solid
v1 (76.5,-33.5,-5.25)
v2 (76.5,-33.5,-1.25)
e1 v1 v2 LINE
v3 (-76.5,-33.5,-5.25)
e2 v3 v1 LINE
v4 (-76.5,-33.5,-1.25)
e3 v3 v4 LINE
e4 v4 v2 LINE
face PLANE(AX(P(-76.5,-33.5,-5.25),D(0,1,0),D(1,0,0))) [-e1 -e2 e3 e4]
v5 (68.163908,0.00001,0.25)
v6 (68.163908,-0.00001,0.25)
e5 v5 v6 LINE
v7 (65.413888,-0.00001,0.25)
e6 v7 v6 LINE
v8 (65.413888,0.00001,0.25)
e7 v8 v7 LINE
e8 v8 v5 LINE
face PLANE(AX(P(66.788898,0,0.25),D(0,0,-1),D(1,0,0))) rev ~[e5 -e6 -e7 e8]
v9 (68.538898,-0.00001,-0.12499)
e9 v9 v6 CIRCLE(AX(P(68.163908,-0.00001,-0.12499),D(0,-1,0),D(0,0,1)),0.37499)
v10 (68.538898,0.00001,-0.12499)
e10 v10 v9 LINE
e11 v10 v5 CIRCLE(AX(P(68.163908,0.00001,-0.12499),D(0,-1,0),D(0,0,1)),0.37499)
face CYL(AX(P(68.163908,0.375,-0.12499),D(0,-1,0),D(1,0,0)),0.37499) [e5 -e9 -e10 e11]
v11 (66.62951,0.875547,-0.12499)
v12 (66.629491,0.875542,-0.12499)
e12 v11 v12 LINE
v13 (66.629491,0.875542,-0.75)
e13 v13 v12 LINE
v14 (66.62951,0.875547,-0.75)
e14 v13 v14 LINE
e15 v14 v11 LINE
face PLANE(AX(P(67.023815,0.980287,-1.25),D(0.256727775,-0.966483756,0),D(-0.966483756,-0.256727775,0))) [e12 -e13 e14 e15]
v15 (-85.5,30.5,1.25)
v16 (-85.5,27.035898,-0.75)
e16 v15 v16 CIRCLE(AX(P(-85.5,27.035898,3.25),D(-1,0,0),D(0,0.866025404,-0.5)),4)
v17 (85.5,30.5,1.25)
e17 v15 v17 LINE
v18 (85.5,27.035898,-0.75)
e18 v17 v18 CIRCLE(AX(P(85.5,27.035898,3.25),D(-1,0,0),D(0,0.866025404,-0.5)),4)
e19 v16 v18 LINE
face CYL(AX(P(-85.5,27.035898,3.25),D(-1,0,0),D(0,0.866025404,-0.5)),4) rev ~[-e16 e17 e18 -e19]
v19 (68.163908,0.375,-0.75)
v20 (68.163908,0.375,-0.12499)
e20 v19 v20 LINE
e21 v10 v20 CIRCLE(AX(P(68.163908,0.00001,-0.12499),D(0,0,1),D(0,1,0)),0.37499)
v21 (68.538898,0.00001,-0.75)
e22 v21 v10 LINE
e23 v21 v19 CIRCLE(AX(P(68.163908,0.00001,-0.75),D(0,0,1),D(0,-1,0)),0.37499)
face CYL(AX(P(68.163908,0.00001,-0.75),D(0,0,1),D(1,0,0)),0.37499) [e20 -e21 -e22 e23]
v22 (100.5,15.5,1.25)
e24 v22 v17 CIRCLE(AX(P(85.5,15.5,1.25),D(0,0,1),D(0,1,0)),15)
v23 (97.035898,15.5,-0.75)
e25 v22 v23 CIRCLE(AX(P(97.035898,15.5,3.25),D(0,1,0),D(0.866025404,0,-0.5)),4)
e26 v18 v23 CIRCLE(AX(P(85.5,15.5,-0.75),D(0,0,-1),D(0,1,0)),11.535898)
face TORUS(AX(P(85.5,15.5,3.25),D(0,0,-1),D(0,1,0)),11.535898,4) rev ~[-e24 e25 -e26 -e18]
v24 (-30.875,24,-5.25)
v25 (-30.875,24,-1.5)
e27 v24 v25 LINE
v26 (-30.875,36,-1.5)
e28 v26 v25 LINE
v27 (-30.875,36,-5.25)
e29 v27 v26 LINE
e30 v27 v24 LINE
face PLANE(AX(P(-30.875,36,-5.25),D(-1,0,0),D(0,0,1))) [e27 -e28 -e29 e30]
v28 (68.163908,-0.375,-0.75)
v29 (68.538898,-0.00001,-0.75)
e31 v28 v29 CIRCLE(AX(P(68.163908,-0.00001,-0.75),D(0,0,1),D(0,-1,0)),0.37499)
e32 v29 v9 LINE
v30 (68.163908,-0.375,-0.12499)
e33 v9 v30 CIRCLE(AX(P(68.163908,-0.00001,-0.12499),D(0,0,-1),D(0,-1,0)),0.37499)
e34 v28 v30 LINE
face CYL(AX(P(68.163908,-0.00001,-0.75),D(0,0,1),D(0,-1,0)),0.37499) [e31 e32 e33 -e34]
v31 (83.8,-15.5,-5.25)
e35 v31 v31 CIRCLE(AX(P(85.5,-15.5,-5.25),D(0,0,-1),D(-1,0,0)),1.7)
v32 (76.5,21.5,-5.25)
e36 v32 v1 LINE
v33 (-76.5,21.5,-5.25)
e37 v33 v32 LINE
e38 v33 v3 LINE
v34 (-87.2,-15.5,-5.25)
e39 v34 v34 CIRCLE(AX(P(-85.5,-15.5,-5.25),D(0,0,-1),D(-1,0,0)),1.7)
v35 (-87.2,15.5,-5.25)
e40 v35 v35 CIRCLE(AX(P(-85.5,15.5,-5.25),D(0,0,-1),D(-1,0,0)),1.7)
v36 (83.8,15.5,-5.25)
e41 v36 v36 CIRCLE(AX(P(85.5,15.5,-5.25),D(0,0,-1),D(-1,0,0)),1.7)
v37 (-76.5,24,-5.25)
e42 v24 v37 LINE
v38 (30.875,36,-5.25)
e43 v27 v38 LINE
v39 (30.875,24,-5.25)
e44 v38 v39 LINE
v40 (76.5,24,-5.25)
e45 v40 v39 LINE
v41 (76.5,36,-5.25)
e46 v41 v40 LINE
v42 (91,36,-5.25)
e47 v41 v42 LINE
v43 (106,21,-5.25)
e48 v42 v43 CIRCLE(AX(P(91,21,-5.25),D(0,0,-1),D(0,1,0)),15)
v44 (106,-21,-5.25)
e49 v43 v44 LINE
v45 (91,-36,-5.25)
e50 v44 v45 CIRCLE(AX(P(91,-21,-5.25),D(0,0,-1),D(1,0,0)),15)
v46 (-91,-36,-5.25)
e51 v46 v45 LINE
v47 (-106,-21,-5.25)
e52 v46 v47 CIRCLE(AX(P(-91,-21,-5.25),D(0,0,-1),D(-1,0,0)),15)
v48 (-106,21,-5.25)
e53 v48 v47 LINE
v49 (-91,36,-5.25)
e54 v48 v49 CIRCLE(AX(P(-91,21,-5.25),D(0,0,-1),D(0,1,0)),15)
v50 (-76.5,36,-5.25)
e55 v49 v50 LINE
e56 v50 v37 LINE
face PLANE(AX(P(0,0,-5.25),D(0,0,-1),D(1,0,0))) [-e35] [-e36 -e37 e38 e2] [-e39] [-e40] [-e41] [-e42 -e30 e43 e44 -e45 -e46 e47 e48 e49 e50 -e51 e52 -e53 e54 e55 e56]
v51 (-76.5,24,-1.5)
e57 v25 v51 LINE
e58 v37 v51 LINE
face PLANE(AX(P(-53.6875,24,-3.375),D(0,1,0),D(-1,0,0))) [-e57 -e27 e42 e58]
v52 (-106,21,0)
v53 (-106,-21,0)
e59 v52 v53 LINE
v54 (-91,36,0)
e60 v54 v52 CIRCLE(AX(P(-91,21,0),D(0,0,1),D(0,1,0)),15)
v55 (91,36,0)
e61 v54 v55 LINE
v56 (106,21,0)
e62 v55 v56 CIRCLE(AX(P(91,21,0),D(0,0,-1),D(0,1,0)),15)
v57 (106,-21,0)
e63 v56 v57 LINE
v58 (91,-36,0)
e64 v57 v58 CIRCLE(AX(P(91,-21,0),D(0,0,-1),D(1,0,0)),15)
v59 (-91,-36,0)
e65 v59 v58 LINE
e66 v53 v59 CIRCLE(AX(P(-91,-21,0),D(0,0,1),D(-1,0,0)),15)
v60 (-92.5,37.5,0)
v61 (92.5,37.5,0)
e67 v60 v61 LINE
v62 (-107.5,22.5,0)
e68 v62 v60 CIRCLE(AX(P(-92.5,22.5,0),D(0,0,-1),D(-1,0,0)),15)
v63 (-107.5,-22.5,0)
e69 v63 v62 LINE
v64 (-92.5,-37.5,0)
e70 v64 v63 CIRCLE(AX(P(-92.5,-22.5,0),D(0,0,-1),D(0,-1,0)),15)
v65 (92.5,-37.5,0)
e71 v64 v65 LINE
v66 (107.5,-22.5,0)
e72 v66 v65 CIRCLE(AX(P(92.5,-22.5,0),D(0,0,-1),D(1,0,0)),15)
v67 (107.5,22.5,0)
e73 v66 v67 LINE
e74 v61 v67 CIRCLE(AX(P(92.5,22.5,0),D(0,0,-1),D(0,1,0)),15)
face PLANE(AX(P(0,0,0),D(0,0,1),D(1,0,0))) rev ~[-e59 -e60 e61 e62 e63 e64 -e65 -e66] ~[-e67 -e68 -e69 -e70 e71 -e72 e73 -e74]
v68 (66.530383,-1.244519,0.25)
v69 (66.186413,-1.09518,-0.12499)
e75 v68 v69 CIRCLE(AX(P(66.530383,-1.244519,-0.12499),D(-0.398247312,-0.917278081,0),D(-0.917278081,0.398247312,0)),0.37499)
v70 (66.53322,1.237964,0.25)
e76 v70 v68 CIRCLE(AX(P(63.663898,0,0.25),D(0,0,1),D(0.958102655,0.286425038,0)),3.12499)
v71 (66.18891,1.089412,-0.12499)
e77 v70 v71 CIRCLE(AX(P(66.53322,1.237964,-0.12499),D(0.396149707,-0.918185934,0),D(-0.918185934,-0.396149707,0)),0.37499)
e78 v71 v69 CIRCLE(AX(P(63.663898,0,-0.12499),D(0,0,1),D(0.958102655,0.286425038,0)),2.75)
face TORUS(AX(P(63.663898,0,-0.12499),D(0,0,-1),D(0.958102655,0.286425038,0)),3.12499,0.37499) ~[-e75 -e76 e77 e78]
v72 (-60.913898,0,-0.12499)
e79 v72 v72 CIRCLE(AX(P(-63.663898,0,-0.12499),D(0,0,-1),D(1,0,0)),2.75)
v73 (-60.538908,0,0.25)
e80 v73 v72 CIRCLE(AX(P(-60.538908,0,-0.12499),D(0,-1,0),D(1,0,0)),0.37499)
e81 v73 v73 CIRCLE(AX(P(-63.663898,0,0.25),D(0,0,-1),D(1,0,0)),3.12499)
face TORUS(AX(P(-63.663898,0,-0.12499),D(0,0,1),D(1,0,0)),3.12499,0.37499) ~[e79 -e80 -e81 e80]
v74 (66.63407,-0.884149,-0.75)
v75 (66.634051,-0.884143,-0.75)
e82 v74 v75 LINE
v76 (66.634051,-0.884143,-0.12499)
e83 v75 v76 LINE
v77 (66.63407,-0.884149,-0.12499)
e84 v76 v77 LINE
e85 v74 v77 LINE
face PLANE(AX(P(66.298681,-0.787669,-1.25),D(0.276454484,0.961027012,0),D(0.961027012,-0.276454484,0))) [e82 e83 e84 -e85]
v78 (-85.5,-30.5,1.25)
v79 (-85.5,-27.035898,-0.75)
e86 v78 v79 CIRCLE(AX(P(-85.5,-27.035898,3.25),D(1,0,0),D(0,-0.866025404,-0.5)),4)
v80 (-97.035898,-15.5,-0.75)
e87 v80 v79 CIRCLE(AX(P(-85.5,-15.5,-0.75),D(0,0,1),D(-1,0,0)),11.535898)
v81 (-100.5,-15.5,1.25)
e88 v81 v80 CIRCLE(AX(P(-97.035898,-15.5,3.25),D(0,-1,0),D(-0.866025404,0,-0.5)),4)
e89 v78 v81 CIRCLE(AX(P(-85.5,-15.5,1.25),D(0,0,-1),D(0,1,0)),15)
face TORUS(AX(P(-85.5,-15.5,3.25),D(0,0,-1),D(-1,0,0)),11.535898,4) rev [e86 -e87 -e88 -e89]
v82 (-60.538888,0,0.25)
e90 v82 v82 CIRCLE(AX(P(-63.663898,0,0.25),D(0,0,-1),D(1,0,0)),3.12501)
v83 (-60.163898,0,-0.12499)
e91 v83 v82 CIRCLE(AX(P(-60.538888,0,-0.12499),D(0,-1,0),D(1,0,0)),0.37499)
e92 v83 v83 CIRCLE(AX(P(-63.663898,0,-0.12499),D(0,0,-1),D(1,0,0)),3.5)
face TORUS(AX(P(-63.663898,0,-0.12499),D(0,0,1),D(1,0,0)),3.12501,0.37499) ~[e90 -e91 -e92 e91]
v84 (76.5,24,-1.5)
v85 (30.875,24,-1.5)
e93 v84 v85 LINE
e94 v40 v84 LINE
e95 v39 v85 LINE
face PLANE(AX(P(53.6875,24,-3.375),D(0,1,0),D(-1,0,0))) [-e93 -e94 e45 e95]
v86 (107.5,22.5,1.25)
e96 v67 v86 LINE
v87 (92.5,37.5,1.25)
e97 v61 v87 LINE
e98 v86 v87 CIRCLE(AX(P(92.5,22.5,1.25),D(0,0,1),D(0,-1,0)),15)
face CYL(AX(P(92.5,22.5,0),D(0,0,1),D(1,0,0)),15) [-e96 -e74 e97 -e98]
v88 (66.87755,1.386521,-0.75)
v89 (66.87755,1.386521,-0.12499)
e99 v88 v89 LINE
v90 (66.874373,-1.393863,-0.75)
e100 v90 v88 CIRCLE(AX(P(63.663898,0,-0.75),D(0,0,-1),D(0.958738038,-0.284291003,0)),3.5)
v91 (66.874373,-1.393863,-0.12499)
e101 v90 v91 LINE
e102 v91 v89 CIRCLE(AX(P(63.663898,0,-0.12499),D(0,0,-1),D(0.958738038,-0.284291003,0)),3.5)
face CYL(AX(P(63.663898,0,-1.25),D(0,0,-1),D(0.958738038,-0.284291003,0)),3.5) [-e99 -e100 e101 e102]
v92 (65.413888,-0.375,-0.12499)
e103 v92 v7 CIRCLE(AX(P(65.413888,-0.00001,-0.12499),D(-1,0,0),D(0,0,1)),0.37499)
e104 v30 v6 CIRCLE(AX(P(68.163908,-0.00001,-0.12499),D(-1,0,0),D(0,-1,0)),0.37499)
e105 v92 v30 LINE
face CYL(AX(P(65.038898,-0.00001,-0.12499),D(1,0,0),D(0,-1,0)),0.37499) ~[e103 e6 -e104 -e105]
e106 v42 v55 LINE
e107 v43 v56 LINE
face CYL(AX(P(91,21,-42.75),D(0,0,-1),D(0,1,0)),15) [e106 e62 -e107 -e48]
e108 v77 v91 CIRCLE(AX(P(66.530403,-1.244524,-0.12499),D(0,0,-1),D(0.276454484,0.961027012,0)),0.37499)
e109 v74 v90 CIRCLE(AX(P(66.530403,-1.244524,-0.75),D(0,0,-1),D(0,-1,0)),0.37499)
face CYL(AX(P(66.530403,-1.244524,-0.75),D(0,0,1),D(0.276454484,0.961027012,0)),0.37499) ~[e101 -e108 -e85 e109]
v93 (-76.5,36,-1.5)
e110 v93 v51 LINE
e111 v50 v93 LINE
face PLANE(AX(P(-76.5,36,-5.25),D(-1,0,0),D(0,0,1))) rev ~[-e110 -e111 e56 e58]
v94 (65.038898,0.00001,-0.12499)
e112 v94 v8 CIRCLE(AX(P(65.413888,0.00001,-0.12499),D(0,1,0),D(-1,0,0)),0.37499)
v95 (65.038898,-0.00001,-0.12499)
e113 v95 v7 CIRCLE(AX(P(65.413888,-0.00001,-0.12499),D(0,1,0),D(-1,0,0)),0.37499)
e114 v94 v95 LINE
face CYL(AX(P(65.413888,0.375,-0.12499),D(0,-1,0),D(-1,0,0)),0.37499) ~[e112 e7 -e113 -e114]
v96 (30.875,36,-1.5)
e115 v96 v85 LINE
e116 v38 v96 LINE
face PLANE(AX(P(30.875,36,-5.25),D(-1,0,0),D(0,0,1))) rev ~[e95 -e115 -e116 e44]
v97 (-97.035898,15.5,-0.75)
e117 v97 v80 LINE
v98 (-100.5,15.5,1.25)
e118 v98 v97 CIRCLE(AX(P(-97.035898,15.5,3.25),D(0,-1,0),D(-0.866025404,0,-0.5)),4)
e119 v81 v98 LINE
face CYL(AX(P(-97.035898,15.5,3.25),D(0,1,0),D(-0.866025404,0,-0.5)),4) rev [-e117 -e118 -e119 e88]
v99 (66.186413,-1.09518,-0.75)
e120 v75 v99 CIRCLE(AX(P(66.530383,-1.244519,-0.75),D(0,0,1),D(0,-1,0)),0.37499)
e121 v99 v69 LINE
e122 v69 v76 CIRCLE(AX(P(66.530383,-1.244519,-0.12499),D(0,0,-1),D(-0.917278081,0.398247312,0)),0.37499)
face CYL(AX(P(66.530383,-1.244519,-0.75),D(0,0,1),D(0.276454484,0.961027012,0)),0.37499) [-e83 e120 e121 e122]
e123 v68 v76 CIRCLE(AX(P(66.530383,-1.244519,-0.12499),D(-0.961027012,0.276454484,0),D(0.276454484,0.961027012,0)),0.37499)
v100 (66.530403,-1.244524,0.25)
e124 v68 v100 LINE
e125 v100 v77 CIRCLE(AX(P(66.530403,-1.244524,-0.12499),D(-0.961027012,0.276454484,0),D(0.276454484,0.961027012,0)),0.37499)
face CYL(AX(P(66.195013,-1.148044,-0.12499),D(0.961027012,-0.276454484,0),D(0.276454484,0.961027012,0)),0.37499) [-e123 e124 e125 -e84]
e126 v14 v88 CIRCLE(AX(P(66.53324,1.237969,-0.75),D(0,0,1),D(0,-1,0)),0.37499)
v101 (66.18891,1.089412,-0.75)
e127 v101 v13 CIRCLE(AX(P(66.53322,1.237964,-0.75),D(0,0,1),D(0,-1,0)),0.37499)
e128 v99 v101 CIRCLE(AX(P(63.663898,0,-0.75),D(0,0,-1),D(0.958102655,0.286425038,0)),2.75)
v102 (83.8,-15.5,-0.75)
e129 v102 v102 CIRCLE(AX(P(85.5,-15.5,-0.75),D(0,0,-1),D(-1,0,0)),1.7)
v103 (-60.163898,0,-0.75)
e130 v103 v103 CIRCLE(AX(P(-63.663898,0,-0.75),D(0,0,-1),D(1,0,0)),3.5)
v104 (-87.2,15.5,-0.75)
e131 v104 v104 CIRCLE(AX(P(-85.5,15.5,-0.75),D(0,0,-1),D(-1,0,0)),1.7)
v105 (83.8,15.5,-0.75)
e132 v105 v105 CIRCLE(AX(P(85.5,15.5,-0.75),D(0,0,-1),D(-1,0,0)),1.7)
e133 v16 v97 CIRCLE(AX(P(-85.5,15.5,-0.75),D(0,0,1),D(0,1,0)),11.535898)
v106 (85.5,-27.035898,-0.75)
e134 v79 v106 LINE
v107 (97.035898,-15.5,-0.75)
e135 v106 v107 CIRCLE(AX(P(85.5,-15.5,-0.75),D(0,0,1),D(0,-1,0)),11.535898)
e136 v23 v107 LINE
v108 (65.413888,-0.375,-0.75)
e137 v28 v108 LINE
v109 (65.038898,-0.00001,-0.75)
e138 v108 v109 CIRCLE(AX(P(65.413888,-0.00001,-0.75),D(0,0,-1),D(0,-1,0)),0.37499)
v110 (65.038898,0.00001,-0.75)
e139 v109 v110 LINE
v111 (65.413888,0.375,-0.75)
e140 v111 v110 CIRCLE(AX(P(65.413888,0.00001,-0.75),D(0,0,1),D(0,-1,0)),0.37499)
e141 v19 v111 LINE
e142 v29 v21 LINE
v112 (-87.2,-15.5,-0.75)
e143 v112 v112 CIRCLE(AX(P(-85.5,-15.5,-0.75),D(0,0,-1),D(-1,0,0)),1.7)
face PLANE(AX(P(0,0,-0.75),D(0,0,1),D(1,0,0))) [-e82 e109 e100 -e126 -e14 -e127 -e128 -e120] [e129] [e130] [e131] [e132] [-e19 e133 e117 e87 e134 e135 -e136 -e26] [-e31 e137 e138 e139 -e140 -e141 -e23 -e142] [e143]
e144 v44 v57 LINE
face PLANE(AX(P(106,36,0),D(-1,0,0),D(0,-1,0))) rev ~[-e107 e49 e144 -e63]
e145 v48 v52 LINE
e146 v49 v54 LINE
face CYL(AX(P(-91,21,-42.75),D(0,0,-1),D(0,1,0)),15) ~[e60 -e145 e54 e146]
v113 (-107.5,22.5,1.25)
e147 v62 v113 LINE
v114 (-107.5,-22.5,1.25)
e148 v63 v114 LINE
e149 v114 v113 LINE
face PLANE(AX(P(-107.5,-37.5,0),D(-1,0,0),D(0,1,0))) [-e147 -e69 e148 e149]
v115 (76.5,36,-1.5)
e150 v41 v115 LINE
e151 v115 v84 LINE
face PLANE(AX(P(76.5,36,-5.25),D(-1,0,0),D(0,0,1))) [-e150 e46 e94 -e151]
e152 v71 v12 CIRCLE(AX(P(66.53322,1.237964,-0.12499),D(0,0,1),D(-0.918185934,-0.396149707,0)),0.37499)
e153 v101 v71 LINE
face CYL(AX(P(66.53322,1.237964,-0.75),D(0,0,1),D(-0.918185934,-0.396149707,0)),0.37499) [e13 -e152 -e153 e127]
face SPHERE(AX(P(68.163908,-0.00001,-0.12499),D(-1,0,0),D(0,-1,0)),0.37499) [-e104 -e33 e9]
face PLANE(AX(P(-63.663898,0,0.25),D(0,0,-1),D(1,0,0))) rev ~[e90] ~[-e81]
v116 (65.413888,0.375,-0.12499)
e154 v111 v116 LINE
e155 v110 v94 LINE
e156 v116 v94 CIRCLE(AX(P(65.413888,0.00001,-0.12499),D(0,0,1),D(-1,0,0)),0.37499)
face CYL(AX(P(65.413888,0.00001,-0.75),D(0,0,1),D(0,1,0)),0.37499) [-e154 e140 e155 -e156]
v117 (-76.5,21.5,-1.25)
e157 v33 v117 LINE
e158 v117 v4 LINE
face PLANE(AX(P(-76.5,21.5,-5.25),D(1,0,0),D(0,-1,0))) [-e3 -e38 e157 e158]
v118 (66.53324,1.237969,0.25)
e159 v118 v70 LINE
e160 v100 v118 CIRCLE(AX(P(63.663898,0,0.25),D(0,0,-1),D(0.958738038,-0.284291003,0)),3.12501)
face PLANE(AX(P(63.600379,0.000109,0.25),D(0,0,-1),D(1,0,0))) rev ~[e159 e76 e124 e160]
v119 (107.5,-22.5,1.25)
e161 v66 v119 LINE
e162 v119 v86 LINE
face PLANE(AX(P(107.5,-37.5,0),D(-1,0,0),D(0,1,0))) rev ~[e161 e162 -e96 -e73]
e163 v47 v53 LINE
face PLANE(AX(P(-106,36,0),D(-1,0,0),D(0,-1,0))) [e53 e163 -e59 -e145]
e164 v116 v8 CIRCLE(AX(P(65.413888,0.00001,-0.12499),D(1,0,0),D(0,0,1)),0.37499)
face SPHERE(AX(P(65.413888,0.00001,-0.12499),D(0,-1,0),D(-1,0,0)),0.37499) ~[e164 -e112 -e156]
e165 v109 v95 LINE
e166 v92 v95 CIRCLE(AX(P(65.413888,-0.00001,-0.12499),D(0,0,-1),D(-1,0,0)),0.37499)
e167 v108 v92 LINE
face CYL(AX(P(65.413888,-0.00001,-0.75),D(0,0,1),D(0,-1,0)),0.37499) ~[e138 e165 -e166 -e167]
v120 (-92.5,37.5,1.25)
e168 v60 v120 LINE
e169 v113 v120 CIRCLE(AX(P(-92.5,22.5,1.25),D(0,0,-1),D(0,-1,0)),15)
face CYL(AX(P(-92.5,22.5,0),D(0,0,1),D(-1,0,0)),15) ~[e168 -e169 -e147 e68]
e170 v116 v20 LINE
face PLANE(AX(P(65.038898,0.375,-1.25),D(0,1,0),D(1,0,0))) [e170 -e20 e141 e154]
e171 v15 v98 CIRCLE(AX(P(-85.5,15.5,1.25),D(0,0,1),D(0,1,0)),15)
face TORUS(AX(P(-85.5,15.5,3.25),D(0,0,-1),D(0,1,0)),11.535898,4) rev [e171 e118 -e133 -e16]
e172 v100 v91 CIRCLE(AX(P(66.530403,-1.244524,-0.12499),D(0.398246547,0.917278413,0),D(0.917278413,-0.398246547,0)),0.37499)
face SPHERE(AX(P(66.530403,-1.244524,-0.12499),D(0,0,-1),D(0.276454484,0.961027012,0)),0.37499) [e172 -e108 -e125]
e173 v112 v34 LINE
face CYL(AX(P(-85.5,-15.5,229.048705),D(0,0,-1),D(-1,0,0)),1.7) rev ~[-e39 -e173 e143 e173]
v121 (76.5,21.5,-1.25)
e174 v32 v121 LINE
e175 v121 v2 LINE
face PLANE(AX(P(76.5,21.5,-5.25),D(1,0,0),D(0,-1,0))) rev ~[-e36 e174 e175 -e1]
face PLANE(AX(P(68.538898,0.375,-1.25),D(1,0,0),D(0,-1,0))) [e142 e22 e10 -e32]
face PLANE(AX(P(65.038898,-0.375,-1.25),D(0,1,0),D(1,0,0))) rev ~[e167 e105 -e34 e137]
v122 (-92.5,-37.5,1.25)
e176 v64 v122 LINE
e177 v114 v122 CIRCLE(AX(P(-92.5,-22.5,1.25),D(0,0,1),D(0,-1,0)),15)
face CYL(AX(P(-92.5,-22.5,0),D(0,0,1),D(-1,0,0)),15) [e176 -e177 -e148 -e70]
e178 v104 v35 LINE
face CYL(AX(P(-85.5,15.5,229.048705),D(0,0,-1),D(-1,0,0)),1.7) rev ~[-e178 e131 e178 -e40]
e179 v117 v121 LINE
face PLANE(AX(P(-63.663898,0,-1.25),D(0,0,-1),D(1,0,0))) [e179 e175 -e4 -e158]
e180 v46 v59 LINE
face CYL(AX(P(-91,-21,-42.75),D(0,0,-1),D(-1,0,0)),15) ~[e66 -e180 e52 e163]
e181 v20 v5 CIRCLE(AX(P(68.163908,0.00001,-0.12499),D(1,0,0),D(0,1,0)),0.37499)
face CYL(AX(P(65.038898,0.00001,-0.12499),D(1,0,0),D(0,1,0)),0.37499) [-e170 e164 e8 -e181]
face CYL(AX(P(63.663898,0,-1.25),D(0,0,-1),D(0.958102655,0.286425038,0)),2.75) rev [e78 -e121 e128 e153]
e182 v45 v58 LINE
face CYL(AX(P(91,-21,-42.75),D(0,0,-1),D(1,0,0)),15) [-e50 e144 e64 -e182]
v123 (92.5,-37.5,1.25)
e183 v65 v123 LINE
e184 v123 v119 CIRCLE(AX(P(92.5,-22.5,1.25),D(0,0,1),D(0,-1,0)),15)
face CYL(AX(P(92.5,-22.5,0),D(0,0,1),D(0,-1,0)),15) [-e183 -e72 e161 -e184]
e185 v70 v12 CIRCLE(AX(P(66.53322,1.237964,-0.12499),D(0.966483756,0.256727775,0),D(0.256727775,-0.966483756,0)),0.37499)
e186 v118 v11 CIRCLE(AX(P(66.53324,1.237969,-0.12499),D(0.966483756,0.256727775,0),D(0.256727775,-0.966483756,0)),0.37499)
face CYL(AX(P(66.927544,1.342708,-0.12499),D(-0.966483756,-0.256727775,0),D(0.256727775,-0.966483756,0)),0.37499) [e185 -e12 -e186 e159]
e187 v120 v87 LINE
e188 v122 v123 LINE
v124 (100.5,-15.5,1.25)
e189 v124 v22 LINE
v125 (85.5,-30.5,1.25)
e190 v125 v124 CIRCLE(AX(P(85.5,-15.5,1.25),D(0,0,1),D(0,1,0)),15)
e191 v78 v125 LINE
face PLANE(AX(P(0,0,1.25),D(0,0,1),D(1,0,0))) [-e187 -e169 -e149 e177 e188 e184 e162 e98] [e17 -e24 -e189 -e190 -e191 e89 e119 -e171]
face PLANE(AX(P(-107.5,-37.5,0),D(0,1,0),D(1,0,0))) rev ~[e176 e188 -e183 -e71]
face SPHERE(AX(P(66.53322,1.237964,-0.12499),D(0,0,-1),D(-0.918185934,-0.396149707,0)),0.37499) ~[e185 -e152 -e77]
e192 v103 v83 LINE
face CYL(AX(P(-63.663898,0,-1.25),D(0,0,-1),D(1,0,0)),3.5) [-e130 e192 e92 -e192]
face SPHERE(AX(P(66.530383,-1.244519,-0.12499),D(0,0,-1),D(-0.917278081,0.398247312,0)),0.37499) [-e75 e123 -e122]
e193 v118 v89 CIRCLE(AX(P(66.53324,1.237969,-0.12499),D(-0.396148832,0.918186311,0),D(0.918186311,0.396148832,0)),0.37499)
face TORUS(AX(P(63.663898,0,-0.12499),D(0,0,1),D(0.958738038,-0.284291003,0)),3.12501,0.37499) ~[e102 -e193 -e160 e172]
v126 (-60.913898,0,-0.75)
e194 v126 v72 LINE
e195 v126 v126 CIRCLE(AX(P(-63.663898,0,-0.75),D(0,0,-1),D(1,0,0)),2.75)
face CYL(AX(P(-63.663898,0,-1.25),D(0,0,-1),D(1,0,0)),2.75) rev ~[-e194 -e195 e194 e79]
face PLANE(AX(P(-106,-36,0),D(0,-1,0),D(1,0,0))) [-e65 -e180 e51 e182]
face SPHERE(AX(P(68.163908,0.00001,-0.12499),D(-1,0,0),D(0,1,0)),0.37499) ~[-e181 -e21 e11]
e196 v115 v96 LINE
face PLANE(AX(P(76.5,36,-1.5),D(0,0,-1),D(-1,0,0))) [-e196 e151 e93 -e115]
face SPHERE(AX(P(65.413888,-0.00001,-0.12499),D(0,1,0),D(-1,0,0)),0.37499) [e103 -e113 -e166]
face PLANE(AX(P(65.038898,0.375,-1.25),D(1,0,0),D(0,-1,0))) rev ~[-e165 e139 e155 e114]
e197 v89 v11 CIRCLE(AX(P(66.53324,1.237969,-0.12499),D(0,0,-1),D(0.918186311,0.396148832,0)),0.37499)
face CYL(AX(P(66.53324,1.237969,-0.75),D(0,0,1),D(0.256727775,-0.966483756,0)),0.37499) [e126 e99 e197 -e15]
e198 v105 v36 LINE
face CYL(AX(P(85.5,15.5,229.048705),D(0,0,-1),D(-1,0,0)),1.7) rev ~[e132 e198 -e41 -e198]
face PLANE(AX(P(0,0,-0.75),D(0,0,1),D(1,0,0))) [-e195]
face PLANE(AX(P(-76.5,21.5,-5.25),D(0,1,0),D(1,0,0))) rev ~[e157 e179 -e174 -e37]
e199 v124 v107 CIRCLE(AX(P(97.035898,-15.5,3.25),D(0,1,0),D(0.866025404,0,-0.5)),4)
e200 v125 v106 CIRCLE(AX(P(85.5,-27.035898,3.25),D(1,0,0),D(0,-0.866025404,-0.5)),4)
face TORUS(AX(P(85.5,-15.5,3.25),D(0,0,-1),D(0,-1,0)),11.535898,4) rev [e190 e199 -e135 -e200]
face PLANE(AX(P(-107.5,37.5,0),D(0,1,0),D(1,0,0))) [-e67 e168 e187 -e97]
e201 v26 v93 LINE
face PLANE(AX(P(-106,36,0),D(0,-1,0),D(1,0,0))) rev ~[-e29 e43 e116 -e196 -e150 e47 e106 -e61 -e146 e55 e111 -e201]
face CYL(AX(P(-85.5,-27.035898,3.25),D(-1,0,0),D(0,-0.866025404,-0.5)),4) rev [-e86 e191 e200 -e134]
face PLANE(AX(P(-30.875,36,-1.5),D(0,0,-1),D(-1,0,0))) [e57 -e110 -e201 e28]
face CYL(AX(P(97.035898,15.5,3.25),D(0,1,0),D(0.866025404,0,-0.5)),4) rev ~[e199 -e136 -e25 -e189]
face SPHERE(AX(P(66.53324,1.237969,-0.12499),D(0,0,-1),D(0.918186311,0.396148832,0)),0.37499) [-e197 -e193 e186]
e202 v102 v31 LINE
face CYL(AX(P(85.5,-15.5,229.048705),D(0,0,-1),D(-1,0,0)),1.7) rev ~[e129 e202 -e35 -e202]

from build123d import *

# Parameters (mm, degrees)
F0_W          = 215
F0_H          = 75
F1_DEPTH      = 1.25
F2_R          = 15
F3_W          = 212
F3_H          = 72
F4_DEPTH      = 5.25
F5_T1_DEPTH   = 42.75
F7_W          = 201
F7_H          = 61
F8_DEPTH      = 2
F9_R          = 15
F10_T1_DEPTH  = 31
F10_T3_DEPTH  = 171
F10_T6_ANGLE  = 90
F10_T8_ANGLE  = 90
F10_T10_ANGLE = 90
F10_T12_ANGLE = 90
F11_W         = 45.625
F11_H         = 3.75
F12_DEPTH     = 12
F13_W         = 153
F13_H         = 55
F14_DEPTH     = 4
F16_D         = 3.4
F17_R         = 3.5
F17_R_2       = 2.75
F17_W         = 3.5
F17_H         = 0.75
F18_DEPTH     = 1.5
F19_R         = 0.37499


# Not quite as in the source:
# - a fillet or chamfer that OpenCascade refuses, or shapes differently, is made with other operations: its cross-section is extruded or revolved along the edge and cut away or added
# - a fillet or chamfer is up to 0.001 mm smaller than in the source, because OpenCascade refuses the exact size


with BuildPart() as f1:
    # F0 (on Top) → F1 (new body)
    with BuildSketch(Plane.XY):
        Rectangle(F0_W, F0_H)
    extrude(amount=F1_DEPTH)

    # F2
    f2_edges = [f1.edges().sort_by_distance(p)[0] for p in [
        (107.5, -37.5, 0.625),
        (107.5, 37.5, 0.625),
        (-107.5, 37.5, 0.625),
        (-107.5, -37.5, 0.625),
    ]]
    fillet(f2_edges, radius=F2_R)

    # F3 (on face) → F4 (join)
    with BuildSketch(Plane(origin=(0, 0, 0), x_dir=(1, 0, 0), z_dir=(0, 0, -1))):
        Rectangle(F3_W, F3_H)
    extrude(amount=F4_DEPTH)

    # F5: fillet of radius 15 on 4 edges, made by hand

    # F5_s2 → F5_t1 (cut)
    with BuildSketch(Plane.XY.offset(-42.75)):
        with BuildLine():
            ThreePointArc((-106, -21), (-101.6066017178, -31.6066017178), (-91, -36))
            Line((-91, -36), (-106, -36))
            Line((-106, -36), (-106, -21))
        make_face()
        with BuildLine():
            ThreePointArc((-91, 36), (-101.6066017178, 31.6066017178), (-106, 21))
            Line((-106, 21), (-106, 36))
            Line((-106, 36), (-91, 36))
        make_face()
        with BuildLine():
            ThreePointArc((91, 36), (101.6066017178, 31.6066017178), (106, 21))
            Line((106, 21), (106, 36))
            Line((106, 36), (91, 36))
        make_face()
        with BuildLine():
            ThreePointArc((106, -21), (101.6066017178, -31.6066017178), (91, -36))
            Line((91, -36), (106, -36))
            Line((106, -36), (106, -21))
        make_face()
    extrude(amount=F5_T1_DEPTH, mode=Mode.SUBTRACT)

    # F7 (on face) → F8 (cut)
    with BuildSketch(Plane.XY.offset(1.25)):
        Rectangle(F7_W, F7_H)
    extrude(amount=-F8_DEPTH, mode=Mode.SUBTRACT)

    # F9
    f9_edges = [f1.edges().sort_by_distance(p)[0] for p in [
        (-100.5, 30.5, 0.25),
        (-100.5, -30.5, 0.25),
        (100.5, 30.5, 0.25),
        (100.5, -30.5, 0.25),
    ]]
    fillet(f9_edges, radius=F9_R)

    # F10: fillet of radius 4 on 1 edges, made by hand

    # F10_s2 → F10_t1 (join)
    with BuildSketch(Plane.XZ.offset(-15.5)):
        with BuildLine():
            ThreePointArc((-100.5, 1.25), (-99.0358983849, -0.2141016151), (-97.0358983849, -0.75))
            Line((-97.0358983849, -0.75), (-100.5, -0.75))
            Line((-100.5, -0.75), (-100.5, 1.25))
        make_face()
        with BuildLine():
            ThreePointArc((100.5, 1.25), (99.0358983849, -0.2141016151), (97.0358983849, -0.75))
            Line((97.0358983849, -0.75), (100.5, -0.75))
            Line((100.5, -0.75), (100.5, 1.25))
        make_face()
    extrude(amount=F10_T1_DEPTH)

    # F10_s4 → F10_t3 (join)
    with BuildSketch(Plane.YZ.offset(-85.5)):
        with BuildLine():
            ThreePointArc((-30.5, 1.25), (-29.0358983849, -0.2141016151), (-27.0358983849, -0.75))
            Line((-27.0358983849, -0.75), (-30.5, -0.75))
            Line((-30.5, -0.75), (-30.5, 1.25))
        make_face()
        with BuildLine():
            ThreePointArc((30.5, 1.25), (29.0358983849, -0.2141016151), (27.0358983849, -0.75))
            Line((27.0358983849, -0.75), (30.5, -0.75))
            Line((30.5, -0.75), (30.5, 1.25))
        make_face()
    extrude(amount=F10_T3_DEPTH)

    # F10_s5 → F10_t6 (revolve)
    with BuildSketch(Plane.YZ.offset(-85.5)):
        with BuildLine():
            ThreePointArc((30.5, 1.25), (29.0358983849, -0.2141016151), (27.0358983849, -0.75))
            Line((27.0358983849, -0.75), (30.5, -0.75))
            Line((30.5, -0.75), (30.5, 1.25))
        make_face()
    revolve(axis=Axis((-85.5, 15.5, -0.75), (0, 0, 1)), revolution_arc=F10_T6_ANGLE)

    # F10_s7 → F10_t8 (revolve)
    with BuildSketch(Plane.XZ.offset(15.5)):
        with BuildLine():
            ThreePointArc((-100.5, 1.25), (-99.0358983849, -0.2141016151), (-97.0358983849, -0.75))
            Line((-97.0358983849, -0.75), (-100.5, -0.75))
            Line((-100.5, -0.75), (-100.5, 1.25))
        make_face()
    revolve(axis=Axis((-85.5, -15.5, -0.75), (0, 0, 1)), revolution_arc=F10_T8_ANGLE)

    # F10_s9 → F10_t10 (revolve)
    with BuildSketch(Plane.YZ.offset(85.5)):
        with BuildLine():
            ThreePointArc((-30.5, 1.25), (-29.0358983849, -0.2141016151), (-27.0358983849, -0.75))
            Line((-27.0358983849, -0.75), (-30.5, -0.75))
            Line((-30.5, -0.75), (-30.5, 1.25))
        make_face()
    revolve(axis=Axis((85.5, -15.5, -0.75), (0, 0, 1)), revolution_arc=F10_T10_ANGLE)

    # F10_s11 → F10_t12 (revolve)
    with BuildSketch(Plane.YZ.offset(85.5)):
        with BuildLine():
            ThreePointArc((30.5, 1.25), (29.0358983849, -0.2141016151), (27.0358983849, -0.75))
            Line((27.0358983849, -0.75), (30.5, -0.75))
            Line((30.5, -0.75), (30.5, 1.25))
        make_face()
    revolve(axis=Axis((85.5, 15.5, -0.75), (0, 0, -1)), revolution_arc=F10_T12_ANGLE)

    # F11 (on face) → F12 (cut)
    with BuildSketch(Plane(origin=(0, 36, 0), x_dir=(-1, 0, 0), z_dir=(0, 1, 0))):
        with Locations((-53.6875, -3.375)):
            Rectangle(F11_W, F11_H)
        with Locations((53.6875, -3.375)):
            Rectangle(F11_W, F11_H)
    extrude(amount=-F12_DEPTH, mode=Mode.SUBTRACT)

    # F13 (on face) → F14 (cut)
    with BuildSketch(Plane(origin=(0, 0, -5.25), x_dir=(1, 0, 0), z_dir=(0, 0, -1))):
        with Locations((0, 6)):
            Rectangle(F13_W, F13_H)
    extrude(amount=-F14_DEPTH, mode=Mode.SUBTRACT)

    # F16 (through all)
    with Locations(Plane.XY.offset(1.25)):
        with Locations((-85.5, 15.5), (-85.5, -15.5), (85.5, 15.5), (85.5, -15.5)):
            Hole(F16_D / 2)

    # F17 (on face) → F18 (join)
    with BuildSketch(Plane(origin=(0, 0, -1.25), x_dir=(1, 0, 0), z_dir=(0, 0, -1))):
        with Locations((-63.6638983849, 0)):
            Circle(F17_R)
        with Locations((-63.6638983849, 0)):
            Circle(F17_R_2, mode=Mode.SUBTRACT)
        with BuildLine():
            Line((66.2986806863, 0.7876688543), (67.0194815177, 0.9950185116))
            ThreePointArc((67.0194815177, 0.9950185116), (60.1639068064, -0.0076779243), (67.0238147407, -0.9802867343))
            Line((67.0238147407, -0.9802867343), (66.2986806863, -0.7876688543))
            ThreePointArc((66.2986806863, -0.7876688543), (60.9138983849, 0), (66.2986806863, 0.7876688543))
        make_face()
        with Locations((66.7888983849, 0)):
            Rectangle(F17_W, F17_H)
    extrude(amount=-F18_DEPTH)

    # F19 (radius 0.375 in the source; OpenCascade refuses exactly that, so slightly less here)
    f19_edges = [f1.edges().sort_by_distance(p)[0] for p in [
        (-66.413898, 0, 0.25),
        (-67.163898, 0, 0.25),
        (60.913898, 0, 0.25),
        (60.163907, 0.007678, 0.25),
        (67.019482, -0.995019, -0.25),
        (66.659081, -0.891344, 0.25),
        (66.298681, -0.787669, -0.25),
        (66.661248, 0.883978, 0.25),
        (66.298681, 0.787669, -0.25),
        (67.023815, 0.980287, -0.25),
        (65.038898, 0, 0.25),
        (65.038898, -0.375, -0.25),
        (65.038898, 0.375, -0.25),
        (66.788898, -0.375, 0.25),
        (66.788898, 0.375, 0.25),
        (68.538898, -0.375, -0.25),
        (68.538898, 0.375, -0.25),
        (68.538898, 0, 0.25),
    ]]
    fillet(f19_edges, radius=F19_R)


solid = f1.part
